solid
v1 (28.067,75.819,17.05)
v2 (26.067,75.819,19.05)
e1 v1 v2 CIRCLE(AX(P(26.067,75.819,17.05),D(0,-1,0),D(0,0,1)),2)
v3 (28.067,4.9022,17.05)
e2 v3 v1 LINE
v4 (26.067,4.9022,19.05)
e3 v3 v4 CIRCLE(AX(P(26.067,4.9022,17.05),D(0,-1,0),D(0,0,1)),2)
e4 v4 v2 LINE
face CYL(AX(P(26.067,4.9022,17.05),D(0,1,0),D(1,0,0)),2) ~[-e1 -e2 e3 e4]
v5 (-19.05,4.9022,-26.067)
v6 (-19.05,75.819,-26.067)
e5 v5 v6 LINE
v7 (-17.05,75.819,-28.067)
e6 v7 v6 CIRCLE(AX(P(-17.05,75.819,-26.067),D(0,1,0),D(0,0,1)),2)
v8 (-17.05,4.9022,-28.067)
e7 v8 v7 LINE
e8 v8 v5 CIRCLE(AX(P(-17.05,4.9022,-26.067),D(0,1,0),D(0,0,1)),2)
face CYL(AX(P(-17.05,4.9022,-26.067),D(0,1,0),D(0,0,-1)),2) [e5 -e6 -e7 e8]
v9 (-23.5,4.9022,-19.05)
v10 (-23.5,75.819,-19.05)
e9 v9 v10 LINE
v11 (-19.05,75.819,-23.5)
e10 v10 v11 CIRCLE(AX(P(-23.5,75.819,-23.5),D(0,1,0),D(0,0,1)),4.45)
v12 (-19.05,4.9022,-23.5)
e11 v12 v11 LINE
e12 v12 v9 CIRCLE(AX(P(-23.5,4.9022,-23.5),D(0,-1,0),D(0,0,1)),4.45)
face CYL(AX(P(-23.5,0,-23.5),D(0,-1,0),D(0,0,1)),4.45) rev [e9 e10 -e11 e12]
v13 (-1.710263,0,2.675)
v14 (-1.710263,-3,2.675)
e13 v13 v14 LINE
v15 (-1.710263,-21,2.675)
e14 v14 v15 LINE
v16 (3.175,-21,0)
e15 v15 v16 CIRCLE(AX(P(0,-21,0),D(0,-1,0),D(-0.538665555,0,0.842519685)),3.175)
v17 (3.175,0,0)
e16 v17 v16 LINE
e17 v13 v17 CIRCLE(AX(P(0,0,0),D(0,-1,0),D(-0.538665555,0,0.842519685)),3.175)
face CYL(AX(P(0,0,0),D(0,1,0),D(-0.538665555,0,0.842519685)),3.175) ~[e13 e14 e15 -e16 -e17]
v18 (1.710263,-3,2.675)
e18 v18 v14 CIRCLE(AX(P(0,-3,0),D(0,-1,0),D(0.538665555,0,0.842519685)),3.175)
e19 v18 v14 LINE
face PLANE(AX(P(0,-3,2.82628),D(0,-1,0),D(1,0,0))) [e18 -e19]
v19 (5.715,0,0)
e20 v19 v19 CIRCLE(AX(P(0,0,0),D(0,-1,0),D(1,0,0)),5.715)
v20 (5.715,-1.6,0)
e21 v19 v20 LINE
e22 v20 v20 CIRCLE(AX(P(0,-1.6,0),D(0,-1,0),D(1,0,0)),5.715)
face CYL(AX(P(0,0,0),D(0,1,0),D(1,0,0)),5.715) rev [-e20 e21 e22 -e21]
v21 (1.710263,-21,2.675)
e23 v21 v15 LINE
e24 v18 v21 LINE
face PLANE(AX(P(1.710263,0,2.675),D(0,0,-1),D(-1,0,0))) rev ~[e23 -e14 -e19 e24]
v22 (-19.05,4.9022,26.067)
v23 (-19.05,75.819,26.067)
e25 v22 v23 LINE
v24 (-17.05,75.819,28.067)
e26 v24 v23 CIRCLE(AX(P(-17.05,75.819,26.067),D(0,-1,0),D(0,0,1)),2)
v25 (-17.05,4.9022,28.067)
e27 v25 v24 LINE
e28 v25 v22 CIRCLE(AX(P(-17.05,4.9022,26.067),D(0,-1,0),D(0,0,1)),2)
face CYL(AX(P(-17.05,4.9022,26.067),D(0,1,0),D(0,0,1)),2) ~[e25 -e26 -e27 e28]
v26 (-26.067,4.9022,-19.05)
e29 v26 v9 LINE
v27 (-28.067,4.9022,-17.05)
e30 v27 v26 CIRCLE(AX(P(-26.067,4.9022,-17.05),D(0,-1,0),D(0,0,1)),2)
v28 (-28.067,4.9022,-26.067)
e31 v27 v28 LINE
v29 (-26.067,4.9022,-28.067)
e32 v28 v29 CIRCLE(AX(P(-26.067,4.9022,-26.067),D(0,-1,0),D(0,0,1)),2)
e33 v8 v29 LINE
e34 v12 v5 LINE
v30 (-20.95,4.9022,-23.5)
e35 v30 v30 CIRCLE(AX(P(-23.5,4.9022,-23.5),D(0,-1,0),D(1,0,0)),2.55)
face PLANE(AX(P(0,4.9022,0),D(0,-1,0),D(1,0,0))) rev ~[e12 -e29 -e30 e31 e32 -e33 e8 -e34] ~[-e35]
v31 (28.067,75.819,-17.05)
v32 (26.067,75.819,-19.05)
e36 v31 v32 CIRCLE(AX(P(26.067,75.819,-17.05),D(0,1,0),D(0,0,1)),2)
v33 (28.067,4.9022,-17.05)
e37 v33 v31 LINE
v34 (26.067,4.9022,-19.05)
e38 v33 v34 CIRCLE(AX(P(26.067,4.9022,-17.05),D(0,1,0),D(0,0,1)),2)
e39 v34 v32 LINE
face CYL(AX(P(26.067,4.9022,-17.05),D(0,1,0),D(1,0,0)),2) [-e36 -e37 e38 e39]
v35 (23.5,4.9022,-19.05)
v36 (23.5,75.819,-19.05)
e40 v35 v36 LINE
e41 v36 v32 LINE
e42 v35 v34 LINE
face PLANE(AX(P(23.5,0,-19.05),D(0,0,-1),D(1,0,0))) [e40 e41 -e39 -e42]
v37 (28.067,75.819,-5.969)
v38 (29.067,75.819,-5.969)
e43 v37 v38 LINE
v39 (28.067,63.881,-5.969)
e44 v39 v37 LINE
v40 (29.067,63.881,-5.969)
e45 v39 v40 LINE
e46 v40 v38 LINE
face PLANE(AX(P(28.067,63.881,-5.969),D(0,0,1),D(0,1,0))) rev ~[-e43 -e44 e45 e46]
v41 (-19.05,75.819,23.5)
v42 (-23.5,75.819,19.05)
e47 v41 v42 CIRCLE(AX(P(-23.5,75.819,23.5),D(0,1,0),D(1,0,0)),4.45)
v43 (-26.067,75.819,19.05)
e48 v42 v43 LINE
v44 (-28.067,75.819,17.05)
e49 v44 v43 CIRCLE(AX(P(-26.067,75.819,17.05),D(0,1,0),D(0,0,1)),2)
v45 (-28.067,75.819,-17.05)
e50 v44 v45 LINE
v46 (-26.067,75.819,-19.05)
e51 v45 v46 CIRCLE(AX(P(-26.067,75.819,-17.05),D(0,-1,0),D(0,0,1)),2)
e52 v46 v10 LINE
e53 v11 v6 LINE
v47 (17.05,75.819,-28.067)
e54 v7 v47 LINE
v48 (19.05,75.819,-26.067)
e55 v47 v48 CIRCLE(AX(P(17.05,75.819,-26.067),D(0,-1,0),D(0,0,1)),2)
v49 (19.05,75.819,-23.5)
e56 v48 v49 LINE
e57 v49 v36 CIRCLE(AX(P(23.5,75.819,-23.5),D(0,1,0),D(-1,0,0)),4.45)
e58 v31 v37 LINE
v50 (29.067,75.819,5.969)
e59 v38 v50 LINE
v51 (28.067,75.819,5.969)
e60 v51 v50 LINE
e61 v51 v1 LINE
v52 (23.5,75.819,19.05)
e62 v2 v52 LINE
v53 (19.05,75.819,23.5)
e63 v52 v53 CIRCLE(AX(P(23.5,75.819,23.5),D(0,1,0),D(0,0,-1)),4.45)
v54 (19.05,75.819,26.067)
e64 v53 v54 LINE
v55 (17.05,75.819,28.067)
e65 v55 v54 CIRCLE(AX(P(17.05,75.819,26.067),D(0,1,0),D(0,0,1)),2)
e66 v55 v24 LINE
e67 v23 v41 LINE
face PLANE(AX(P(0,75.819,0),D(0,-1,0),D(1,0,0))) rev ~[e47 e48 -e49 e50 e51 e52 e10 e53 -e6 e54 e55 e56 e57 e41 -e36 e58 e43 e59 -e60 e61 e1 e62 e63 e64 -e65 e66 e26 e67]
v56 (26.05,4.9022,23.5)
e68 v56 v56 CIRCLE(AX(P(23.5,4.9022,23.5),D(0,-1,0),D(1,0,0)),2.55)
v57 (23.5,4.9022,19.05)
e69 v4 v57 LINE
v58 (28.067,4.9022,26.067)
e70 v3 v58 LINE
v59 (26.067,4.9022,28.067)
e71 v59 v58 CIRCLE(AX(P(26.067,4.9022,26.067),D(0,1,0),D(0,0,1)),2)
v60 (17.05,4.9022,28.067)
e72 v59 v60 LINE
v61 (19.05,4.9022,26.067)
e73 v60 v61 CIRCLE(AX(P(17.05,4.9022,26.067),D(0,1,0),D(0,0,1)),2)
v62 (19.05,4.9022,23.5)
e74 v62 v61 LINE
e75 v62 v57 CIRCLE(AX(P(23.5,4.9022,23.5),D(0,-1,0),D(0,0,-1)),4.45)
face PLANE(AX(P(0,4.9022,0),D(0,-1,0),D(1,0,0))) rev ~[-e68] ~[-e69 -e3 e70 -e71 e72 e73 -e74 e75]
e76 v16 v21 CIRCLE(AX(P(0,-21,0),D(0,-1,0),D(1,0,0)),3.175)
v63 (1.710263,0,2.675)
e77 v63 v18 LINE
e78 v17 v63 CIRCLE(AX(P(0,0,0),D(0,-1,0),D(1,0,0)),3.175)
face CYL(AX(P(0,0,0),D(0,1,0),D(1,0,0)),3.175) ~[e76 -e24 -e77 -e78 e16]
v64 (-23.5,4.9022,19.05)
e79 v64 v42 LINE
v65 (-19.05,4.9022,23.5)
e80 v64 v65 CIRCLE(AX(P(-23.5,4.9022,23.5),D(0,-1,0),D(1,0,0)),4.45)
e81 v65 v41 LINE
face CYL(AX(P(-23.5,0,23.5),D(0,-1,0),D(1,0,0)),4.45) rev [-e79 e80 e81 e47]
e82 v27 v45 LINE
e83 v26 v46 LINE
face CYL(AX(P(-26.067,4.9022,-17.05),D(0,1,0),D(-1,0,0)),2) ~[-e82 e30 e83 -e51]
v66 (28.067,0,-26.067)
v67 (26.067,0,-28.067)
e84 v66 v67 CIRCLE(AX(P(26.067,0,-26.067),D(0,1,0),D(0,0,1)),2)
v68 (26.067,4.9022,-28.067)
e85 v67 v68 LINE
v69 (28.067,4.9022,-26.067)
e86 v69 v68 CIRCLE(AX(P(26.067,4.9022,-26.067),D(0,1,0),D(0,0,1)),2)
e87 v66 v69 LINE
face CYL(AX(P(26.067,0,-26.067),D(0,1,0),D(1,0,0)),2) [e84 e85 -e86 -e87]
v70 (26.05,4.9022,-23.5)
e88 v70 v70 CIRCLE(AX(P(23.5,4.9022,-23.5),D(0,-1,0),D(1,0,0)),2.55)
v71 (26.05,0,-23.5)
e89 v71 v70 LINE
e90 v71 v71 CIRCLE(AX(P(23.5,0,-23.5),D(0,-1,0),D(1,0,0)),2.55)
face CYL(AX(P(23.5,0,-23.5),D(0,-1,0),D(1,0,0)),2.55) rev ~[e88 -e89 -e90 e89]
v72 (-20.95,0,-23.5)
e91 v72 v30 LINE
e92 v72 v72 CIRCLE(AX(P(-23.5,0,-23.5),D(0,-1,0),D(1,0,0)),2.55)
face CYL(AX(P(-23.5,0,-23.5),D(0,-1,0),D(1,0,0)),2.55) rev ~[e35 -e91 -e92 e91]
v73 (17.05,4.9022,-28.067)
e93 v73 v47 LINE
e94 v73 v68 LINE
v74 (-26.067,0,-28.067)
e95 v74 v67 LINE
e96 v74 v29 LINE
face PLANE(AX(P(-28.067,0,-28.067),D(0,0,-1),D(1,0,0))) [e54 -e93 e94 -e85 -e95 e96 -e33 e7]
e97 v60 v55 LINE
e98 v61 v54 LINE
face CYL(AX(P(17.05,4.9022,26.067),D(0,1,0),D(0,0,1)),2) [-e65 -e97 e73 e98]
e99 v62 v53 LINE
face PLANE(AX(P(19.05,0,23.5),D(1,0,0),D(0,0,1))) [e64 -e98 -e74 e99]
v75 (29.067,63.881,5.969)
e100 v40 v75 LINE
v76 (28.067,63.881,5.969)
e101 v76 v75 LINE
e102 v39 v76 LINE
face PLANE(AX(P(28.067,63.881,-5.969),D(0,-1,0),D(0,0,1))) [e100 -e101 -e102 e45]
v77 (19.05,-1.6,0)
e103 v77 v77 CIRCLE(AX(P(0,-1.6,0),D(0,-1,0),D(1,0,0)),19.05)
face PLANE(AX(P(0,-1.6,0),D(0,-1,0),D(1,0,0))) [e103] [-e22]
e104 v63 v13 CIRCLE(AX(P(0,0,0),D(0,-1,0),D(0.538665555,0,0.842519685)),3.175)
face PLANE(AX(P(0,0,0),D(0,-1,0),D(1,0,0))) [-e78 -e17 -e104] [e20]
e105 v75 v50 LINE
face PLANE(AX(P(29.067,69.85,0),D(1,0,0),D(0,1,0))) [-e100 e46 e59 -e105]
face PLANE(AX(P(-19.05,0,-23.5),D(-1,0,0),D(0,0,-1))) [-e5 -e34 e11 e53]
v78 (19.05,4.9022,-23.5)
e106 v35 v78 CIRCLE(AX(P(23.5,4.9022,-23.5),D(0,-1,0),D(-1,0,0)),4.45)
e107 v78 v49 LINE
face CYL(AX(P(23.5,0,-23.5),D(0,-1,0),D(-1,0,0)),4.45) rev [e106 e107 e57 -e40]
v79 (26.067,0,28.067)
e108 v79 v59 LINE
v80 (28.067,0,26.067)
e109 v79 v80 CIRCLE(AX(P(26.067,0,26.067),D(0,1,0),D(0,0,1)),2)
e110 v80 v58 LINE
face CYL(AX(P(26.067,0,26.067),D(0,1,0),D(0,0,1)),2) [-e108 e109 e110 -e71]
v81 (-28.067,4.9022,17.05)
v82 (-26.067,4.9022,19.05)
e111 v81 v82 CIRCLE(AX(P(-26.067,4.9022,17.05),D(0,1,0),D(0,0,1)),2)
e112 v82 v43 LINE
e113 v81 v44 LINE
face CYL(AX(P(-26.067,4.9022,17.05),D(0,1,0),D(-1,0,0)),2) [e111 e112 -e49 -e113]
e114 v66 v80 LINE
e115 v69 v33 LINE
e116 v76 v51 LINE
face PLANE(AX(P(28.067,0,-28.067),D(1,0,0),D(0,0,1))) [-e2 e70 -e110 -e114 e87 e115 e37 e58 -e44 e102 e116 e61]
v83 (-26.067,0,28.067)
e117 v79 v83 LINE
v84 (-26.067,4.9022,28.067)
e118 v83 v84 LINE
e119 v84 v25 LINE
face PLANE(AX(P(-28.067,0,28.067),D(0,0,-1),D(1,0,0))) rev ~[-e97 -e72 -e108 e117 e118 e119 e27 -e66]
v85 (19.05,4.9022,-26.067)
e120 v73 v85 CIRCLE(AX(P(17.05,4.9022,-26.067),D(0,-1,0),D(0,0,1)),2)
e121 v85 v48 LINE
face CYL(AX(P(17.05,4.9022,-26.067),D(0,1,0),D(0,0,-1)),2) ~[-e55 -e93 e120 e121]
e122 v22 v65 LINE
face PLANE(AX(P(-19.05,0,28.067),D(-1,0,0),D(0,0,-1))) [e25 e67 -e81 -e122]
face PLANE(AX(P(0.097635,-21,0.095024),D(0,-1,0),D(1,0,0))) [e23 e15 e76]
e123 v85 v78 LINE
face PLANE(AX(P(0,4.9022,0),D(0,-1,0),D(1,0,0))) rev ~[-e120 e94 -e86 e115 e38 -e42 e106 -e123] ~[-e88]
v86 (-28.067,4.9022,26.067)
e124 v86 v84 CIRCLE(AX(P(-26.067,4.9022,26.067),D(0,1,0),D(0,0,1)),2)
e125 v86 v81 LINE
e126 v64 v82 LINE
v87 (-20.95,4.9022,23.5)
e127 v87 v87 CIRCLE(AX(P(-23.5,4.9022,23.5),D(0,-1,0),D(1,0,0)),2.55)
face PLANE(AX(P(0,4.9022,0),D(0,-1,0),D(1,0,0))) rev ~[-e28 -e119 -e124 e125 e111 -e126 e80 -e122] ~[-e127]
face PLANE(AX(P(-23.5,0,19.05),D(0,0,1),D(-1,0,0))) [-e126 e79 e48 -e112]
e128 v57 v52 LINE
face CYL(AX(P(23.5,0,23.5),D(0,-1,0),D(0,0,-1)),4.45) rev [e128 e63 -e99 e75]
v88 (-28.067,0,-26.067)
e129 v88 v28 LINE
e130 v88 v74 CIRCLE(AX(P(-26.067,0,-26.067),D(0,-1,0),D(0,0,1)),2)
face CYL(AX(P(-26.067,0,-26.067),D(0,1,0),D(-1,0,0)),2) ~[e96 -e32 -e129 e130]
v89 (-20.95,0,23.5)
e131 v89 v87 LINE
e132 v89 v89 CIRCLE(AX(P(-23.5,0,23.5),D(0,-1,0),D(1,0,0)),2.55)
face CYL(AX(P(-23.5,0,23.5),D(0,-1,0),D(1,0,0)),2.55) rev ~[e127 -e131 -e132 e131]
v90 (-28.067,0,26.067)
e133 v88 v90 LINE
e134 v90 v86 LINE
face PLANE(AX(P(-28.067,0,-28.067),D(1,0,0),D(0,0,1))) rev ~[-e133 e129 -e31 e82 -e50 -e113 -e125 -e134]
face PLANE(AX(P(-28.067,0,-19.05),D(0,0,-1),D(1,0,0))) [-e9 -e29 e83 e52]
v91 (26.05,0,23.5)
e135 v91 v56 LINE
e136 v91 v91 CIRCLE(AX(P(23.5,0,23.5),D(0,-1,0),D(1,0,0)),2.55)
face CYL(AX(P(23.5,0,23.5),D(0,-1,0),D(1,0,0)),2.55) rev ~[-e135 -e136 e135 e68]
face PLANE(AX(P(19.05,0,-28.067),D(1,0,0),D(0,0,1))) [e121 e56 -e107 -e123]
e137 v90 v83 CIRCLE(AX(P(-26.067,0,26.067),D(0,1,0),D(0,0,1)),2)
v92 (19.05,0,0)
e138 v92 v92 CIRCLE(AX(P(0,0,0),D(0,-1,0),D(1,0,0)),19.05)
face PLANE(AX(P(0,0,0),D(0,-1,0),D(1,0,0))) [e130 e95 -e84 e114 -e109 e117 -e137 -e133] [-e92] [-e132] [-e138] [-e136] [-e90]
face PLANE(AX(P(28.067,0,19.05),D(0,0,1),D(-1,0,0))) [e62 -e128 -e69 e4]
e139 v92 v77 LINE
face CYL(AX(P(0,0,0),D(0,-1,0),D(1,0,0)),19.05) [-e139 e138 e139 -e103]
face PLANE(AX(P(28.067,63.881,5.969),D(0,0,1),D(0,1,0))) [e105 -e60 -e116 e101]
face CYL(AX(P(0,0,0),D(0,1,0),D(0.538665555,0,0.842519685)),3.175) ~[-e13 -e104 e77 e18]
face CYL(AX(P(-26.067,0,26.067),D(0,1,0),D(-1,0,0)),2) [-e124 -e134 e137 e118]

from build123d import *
from build123d import SkipClean  # not in build123d's __all__

# Parameters (mm, degrees)
F1_DEPTH      = 21
F2_DEPTH      = 3
F0_R          = 19.05
F0_R_2        = 5.715
F3_DEPTH      = 1.6
F3_DEPTH_BACK = 10
F0_W          = 56.134
F0_H          = 56.134
F0_R_3        = 2.55
F4_DEPTH      = 4.9022
F6_DEPTH      = 75.819
F7_R          = 2
F8_W          = 11.938
F8_H          = 11.938
F9_DEPTH      = 1


with BuildPart() as f1:
    # F0 (on Front) → F1 (new body)
    with BuildSketch(Plane.XZ):
        with BuildLine():
            ThreePointArc((-1.7102631376, 2.675), (-1.5248835264, -2.7848438432), (3.175, 0))
            ThreePointArc((3.175, 0), (2.7848438432, 1.5248835264), (1.7102631376, 2.675))
            Line((1.7102631376, 2.675), (-1.7102631376, 2.675))
        make_face()
    extrude(amount=F1_DEPTH)

    # F0 (on Front) → F2 (join, symmetric)
    with BuildSketch(Plane.XZ):
        with BuildLine():
            Line((-1.7102631376, 2.675), (1.7102631376, 2.675))
            ThreePointArc((1.7102631376, 2.675), (0, 3.175), (-1.7102631376, 2.675))
        make_face()
        with BuildLine():
            ThreePointArc((-1.7102631376, 2.675), (-1.5248835264, -2.7848438432), (3.175, 0))
            ThreePointArc((3.175, 0), (2.7848438432, 1.5248835264), (1.7102631376, 2.675))
            Line((1.7102631376, 2.675), (-1.7102631376, 2.675))
        make_face()
    with SkipClean():  # cleaning this boolean's faces spoils the solid; the shape is the same uncleaned
        extrude(amount=F2_DEPTH, both=True)



with BuildPart() as f3:
    # F0 (on Front) → F3 (new body, two sides)
    with BuildSketch(Plane.XZ) as f3_sk:
        Circle(F0_R)
        Circle(F0_R_2, mode=Mode.SUBTRACT)
    extrude(amount=F3_DEPTH)
    extrude(f3_sk.sketch, amount=-F3_DEPTH_BACK)

    # F0 (on Front) → F4 (join)
    with BuildSketch(Plane.XZ):
        Rectangle(F0_W, F0_H)
        with Locations((-23.5, -23.5)):
            Circle(F0_R_3, mode=Mode.SUBTRACT)
        with Locations((23.5, -23.5)):
            Circle(F0_R_3, mode=Mode.SUBTRACT)
        with Locations((-23.5, 23.5)):
            Circle(F0_R_3, mode=Mode.SUBTRACT)
        Circle(F0_R, mode=Mode.SUBTRACT)
        with Locations((23.5, 23.5)):
            Circle(F0_R_3, mode=Mode.SUBTRACT)
    extrude(amount=-F4_DEPTH)


with BuildPart() as f1_1:
    add(f1.part, clean=False)

    with SkipClean():  # cleaning this boolean's faces spoils the solid; the shape is the same uncleaned
        add(f3.part)  # F6 merges F3
    # F5 (on Front) → F6 (join)
    with BuildSketch(Plane.XZ):
        with BuildLine():
            ThreePointArc((-19.05, 23.5), (-20.3533748237, 20.3533748237), (-23.5, 19.05))
            Line((-23.5, 19.05), (-28.067, 19.05))
            Line((-28.067, 19.05), (-28.067, -19.05))
            Line((-28.067, -19.05), (-23.5, -19.05))
            ThreePointArc((-23.5, -19.05), (-20.3533748237, -20.3533748237), (-19.05, -23.5))
            Line((-19.05, -23.5), (-19.05, -28.067))
            Line((-19.05, -28.067), (19.05, -28.067))
            Line((19.05, -28.067), (19.05, -23.5))
            ThreePointArc((19.05, -23.5), (20.3533748237, -20.3533748237), (23.5, -19.05))
            Line((23.5, -19.05), (28.067, -19.05))
            Line((28.067, -19.05), (28.067, 19.05))
            Line((28.067, 19.05), (23.5, 19.05))
            ThreePointArc((23.5, 19.05), (20.3533748237, 20.3533748237), (19.05, 23.5))
            Line((19.05, 23.5), (19.05, 28.067))
            Line((19.05, 28.067), (-19.05, 28.067))
            Line((-19.05, 28.067), (-19.05, 23.5))
        make_face()
    with SkipClean():  # cleaning this boolean's faces spoils the solid; the shape is the same uncleaned
        extrude(amount=-F6_DEPTH)

    # F7
    f7_edges = [f1_1.edges().sort_by_distance(p)[0] for p in [
        (19.05, 40.3606, 28.067),
        (28.067, 40.3606, 19.05),
        (28.067, 2.4511, 28.067),
        (28.067, 2.4511, -28.067),
        (28.067, 40.3606, -19.05),
        (19.05, 40.3606, -28.067),
        (-19.05, 40.3606, -28.067),
        (-28.067, 40.3606, -19.05),
        (-28.067, 2.4511, -28.067),
        (-28.067, 2.4511, 28.067),
        (-28.067, 40.3606, 19.05),
        (-19.05, 40.3606, 28.067),
    ]]
    fillet(f7_edges, radius=F7_R)

    # F8 (on face) → F9 (join)
    with BuildSketch(Plane.YZ.offset(28.067)):
        with Locations((69.85, 0)):
            Rectangle(F8_W, F8_H)
    extrude(amount=F9_DEPTH)


solid = f1_1.part
